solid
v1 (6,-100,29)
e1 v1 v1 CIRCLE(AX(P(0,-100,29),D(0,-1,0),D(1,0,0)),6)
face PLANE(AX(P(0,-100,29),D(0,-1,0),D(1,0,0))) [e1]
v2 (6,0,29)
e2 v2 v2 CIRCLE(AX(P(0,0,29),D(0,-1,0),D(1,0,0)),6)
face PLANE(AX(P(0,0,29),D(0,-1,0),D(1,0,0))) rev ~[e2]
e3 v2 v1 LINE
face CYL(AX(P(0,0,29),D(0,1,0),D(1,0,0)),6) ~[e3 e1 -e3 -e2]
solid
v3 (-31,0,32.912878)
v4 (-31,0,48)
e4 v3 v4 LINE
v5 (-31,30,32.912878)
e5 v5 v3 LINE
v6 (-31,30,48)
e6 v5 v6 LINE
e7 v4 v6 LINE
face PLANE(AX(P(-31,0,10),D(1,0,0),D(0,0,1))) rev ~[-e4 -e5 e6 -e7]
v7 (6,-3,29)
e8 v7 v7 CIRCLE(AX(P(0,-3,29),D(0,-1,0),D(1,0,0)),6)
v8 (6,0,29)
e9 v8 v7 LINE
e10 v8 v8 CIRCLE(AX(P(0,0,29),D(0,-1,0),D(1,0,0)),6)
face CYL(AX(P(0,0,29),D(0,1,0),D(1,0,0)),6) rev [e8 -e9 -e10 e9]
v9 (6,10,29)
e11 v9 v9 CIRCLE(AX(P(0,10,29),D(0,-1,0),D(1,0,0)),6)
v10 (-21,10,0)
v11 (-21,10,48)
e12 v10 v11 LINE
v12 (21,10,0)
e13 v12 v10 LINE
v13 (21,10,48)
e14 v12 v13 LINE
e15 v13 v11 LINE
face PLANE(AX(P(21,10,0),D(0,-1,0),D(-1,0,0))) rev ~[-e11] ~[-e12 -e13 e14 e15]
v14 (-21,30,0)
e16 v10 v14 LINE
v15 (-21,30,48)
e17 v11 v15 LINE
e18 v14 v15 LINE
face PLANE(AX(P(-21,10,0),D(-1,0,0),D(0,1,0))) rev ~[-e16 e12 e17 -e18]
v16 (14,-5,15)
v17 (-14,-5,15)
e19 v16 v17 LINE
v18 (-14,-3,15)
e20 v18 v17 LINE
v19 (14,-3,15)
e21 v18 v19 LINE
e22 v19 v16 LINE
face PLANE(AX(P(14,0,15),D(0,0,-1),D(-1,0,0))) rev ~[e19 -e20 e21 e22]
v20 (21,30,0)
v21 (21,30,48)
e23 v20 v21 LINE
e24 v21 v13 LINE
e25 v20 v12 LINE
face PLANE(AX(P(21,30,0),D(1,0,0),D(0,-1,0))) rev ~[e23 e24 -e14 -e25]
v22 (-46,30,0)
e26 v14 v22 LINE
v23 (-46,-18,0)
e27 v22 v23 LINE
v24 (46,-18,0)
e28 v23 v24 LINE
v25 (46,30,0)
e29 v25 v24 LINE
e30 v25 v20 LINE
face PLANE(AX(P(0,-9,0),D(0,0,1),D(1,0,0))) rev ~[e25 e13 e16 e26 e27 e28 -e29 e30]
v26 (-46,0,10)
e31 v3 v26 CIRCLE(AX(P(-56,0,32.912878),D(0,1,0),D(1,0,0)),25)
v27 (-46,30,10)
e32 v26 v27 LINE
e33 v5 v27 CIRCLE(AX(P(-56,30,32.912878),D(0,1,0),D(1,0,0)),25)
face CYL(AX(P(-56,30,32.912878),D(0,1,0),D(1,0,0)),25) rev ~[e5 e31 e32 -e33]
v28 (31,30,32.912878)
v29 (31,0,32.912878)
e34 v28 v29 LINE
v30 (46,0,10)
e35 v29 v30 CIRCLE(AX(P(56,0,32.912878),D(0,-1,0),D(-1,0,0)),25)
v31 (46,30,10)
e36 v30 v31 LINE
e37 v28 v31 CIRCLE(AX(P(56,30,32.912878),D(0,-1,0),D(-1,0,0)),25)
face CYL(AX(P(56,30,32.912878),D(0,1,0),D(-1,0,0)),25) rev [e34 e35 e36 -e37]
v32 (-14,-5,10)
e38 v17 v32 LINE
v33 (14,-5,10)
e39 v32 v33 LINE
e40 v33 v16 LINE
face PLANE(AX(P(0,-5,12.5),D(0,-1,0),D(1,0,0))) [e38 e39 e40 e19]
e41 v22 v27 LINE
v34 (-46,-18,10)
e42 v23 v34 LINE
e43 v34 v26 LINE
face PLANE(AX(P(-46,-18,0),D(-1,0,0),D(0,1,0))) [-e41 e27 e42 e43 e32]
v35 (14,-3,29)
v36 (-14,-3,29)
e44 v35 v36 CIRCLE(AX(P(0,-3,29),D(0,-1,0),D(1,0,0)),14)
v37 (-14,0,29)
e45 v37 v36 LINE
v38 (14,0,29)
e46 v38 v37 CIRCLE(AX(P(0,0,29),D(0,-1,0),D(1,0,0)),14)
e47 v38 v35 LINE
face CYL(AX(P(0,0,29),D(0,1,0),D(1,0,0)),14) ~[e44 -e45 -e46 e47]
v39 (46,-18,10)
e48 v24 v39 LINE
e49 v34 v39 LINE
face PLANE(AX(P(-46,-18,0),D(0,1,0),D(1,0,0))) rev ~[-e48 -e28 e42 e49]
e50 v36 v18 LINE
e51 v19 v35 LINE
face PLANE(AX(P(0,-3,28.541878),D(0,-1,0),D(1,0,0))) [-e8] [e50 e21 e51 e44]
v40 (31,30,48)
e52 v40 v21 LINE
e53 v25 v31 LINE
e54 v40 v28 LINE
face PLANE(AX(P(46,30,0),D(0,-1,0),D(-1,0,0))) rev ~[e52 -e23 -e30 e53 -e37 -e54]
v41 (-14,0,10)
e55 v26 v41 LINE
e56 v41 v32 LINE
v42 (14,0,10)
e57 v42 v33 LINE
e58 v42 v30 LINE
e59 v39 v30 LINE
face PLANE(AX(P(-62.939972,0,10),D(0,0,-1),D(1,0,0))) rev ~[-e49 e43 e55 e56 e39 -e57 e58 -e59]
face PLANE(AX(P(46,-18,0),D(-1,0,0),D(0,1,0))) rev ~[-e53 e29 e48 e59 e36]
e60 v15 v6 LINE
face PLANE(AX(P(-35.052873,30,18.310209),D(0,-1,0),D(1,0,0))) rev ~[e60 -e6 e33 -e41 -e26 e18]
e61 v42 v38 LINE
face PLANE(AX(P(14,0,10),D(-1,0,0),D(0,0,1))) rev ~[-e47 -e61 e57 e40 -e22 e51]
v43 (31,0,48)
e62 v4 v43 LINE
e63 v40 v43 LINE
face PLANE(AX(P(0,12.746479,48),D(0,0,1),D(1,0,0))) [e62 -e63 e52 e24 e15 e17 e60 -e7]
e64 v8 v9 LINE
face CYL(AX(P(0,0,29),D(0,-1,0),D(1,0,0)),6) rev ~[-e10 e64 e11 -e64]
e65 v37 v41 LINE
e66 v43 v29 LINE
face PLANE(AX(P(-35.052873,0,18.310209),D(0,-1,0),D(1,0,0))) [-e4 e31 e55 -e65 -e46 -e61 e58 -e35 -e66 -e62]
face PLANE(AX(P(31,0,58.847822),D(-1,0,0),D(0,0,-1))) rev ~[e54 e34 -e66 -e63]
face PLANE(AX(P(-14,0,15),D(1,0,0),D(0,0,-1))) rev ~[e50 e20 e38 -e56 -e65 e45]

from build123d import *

# Parameters (mm, degrees)
F1_DEPTH    = 48
F0_W        = 92
F0_H        = 18
F2_DEPTH    = 10
F3_W        = 15
F3_H        = 38
F4_DEPTH    = 50
F5_T1_DEPTH = 30
F6_R        = 6
F7_DEPTH    = 3
F8_DEPTH    = 5
F9_DEPTH    = 25
F10_DEPTH   = 100


# Not quite as in the source:
# - a fillet or chamfer that OpenCascade refuses, or shapes differently, is made with other operations: its cross-section is extruded or revolved along the edge and cut away or added


with BuildPart() as f1:
    # F0 (on Top) → F1 (new body)
    with BuildSketch(Plane.XY):
        Polygon((-46, 30), (-46, 0), (46, 0), (46, 30), (21, 30), (21, 10), (-21, 10), (-21, 30), align=None)
    extrude(amount=F1_DEPTH)

    # F0 (on Top) → F2 (join)
    with BuildSketch(Plane.XY):
        with Locations((0, -9)):
            Rectangle(F0_W, F0_H)
    extrude(amount=F2_DEPTH)

    # F3 (on face) → F4 (cut)
    with BuildSketch(Plane.XZ):
        Polygon((-31, 48), (-31, 58.456501329), (-68.4553310275, 62.7410188317), (-62.9399716854, 10), (-46, 10), (-46, 48), align=None)
        with Locations((-38.5, 29)):
            Rectangle(F3_W, F3_H)
        with Locations((38.5, 29)):
            Rectangle(F3_W, F3_H)
        Polygon((31, 58.8478222489), (31, 48), (46, 48), (46, 10), (62.6155510545, 10), (62.6155510545, 62.4165832996), align=None)
    extrude(amount=-F4_DEPTH, mode=Mode.SUBTRACT)

    # F5: fillet of radius 25 on 2 edges, made by hand

    # F5_s2 → F5_t1 (join)
    with BuildSketch(Plane.XZ.offset(-30)):
        with BuildLine():
            ThreePointArc((-31, 32.9128784748), (-35.0834993366, 19.2198145372), (-46, 10))
            Line((-46, 10), (-31, 10))
            Line((-31, 10), (-31, 32.9128784748))
        make_face()
        with BuildLine():
            ThreePointArc((31, 32.9128784748), (35.0834993366, 19.2198145372), (46, 10))
            Line((46, 10), (31, 10))
            Line((31, 10), (31, 32.9128784748))
        make_face()
    extrude(amount=F5_T1_DEPTH)

    # F6 (on face) → F7 (join)
    with BuildSketch(Plane.XZ):
        with BuildLine():
            ThreePointArc((0, 15), (9.8994949366, 19.1005050634), (14, 29))
            ThreePointArc((14, 29), (0, 43), (-14, 29))
            ThreePointArc((-14, 29), (-9.8994949366, 19.1005050634), (0, 15))
        make_face()
        with Locations((0, 29)):
            Circle(F6_R, mode=Mode.SUBTRACT)
        with BuildLine():
            ThreePointArc((0, 15), (-9.8994949366, 19.1005050634), (-14, 29))
            Line((-14, 29), (-14, 15))
            Line((-14, 15), (0, 15))
        make_face()
        with BuildLine():
            Line((14, 15), (14, 29))
            ThreePointArc((14, 29), (9.8994949366, 19.1005050634), (0, 15))
            Line((0, 15), (14, 15))
        make_face()
    extrude(amount=F7_DEPTH)

    # F6 (on face) → F8 (join)
    with BuildSketch(Plane.XZ):
        Polygon((14, 15), (0, 15), (-14, 15), (-14, 10), (14, 10), align=None)
    extrude(amount=F8_DEPTH)

    # F6 (on face) → F9 (cut)
    with BuildSketch(Plane.XZ):
        with Locations((0, 29)):
            Circle(F6_R)
    extrude(amount=-F9_DEPTH, mode=Mode.SUBTRACT)


with BuildPart() as f10:
    # F6 (on face) → F10 (new body)
    with BuildSketch(Plane.XZ):
        with Locations((0, 29)):
            Circle(F6_R)
    extrude(amount=F10_DEPTH)


solid = Compound([f1.part, f10.part])
